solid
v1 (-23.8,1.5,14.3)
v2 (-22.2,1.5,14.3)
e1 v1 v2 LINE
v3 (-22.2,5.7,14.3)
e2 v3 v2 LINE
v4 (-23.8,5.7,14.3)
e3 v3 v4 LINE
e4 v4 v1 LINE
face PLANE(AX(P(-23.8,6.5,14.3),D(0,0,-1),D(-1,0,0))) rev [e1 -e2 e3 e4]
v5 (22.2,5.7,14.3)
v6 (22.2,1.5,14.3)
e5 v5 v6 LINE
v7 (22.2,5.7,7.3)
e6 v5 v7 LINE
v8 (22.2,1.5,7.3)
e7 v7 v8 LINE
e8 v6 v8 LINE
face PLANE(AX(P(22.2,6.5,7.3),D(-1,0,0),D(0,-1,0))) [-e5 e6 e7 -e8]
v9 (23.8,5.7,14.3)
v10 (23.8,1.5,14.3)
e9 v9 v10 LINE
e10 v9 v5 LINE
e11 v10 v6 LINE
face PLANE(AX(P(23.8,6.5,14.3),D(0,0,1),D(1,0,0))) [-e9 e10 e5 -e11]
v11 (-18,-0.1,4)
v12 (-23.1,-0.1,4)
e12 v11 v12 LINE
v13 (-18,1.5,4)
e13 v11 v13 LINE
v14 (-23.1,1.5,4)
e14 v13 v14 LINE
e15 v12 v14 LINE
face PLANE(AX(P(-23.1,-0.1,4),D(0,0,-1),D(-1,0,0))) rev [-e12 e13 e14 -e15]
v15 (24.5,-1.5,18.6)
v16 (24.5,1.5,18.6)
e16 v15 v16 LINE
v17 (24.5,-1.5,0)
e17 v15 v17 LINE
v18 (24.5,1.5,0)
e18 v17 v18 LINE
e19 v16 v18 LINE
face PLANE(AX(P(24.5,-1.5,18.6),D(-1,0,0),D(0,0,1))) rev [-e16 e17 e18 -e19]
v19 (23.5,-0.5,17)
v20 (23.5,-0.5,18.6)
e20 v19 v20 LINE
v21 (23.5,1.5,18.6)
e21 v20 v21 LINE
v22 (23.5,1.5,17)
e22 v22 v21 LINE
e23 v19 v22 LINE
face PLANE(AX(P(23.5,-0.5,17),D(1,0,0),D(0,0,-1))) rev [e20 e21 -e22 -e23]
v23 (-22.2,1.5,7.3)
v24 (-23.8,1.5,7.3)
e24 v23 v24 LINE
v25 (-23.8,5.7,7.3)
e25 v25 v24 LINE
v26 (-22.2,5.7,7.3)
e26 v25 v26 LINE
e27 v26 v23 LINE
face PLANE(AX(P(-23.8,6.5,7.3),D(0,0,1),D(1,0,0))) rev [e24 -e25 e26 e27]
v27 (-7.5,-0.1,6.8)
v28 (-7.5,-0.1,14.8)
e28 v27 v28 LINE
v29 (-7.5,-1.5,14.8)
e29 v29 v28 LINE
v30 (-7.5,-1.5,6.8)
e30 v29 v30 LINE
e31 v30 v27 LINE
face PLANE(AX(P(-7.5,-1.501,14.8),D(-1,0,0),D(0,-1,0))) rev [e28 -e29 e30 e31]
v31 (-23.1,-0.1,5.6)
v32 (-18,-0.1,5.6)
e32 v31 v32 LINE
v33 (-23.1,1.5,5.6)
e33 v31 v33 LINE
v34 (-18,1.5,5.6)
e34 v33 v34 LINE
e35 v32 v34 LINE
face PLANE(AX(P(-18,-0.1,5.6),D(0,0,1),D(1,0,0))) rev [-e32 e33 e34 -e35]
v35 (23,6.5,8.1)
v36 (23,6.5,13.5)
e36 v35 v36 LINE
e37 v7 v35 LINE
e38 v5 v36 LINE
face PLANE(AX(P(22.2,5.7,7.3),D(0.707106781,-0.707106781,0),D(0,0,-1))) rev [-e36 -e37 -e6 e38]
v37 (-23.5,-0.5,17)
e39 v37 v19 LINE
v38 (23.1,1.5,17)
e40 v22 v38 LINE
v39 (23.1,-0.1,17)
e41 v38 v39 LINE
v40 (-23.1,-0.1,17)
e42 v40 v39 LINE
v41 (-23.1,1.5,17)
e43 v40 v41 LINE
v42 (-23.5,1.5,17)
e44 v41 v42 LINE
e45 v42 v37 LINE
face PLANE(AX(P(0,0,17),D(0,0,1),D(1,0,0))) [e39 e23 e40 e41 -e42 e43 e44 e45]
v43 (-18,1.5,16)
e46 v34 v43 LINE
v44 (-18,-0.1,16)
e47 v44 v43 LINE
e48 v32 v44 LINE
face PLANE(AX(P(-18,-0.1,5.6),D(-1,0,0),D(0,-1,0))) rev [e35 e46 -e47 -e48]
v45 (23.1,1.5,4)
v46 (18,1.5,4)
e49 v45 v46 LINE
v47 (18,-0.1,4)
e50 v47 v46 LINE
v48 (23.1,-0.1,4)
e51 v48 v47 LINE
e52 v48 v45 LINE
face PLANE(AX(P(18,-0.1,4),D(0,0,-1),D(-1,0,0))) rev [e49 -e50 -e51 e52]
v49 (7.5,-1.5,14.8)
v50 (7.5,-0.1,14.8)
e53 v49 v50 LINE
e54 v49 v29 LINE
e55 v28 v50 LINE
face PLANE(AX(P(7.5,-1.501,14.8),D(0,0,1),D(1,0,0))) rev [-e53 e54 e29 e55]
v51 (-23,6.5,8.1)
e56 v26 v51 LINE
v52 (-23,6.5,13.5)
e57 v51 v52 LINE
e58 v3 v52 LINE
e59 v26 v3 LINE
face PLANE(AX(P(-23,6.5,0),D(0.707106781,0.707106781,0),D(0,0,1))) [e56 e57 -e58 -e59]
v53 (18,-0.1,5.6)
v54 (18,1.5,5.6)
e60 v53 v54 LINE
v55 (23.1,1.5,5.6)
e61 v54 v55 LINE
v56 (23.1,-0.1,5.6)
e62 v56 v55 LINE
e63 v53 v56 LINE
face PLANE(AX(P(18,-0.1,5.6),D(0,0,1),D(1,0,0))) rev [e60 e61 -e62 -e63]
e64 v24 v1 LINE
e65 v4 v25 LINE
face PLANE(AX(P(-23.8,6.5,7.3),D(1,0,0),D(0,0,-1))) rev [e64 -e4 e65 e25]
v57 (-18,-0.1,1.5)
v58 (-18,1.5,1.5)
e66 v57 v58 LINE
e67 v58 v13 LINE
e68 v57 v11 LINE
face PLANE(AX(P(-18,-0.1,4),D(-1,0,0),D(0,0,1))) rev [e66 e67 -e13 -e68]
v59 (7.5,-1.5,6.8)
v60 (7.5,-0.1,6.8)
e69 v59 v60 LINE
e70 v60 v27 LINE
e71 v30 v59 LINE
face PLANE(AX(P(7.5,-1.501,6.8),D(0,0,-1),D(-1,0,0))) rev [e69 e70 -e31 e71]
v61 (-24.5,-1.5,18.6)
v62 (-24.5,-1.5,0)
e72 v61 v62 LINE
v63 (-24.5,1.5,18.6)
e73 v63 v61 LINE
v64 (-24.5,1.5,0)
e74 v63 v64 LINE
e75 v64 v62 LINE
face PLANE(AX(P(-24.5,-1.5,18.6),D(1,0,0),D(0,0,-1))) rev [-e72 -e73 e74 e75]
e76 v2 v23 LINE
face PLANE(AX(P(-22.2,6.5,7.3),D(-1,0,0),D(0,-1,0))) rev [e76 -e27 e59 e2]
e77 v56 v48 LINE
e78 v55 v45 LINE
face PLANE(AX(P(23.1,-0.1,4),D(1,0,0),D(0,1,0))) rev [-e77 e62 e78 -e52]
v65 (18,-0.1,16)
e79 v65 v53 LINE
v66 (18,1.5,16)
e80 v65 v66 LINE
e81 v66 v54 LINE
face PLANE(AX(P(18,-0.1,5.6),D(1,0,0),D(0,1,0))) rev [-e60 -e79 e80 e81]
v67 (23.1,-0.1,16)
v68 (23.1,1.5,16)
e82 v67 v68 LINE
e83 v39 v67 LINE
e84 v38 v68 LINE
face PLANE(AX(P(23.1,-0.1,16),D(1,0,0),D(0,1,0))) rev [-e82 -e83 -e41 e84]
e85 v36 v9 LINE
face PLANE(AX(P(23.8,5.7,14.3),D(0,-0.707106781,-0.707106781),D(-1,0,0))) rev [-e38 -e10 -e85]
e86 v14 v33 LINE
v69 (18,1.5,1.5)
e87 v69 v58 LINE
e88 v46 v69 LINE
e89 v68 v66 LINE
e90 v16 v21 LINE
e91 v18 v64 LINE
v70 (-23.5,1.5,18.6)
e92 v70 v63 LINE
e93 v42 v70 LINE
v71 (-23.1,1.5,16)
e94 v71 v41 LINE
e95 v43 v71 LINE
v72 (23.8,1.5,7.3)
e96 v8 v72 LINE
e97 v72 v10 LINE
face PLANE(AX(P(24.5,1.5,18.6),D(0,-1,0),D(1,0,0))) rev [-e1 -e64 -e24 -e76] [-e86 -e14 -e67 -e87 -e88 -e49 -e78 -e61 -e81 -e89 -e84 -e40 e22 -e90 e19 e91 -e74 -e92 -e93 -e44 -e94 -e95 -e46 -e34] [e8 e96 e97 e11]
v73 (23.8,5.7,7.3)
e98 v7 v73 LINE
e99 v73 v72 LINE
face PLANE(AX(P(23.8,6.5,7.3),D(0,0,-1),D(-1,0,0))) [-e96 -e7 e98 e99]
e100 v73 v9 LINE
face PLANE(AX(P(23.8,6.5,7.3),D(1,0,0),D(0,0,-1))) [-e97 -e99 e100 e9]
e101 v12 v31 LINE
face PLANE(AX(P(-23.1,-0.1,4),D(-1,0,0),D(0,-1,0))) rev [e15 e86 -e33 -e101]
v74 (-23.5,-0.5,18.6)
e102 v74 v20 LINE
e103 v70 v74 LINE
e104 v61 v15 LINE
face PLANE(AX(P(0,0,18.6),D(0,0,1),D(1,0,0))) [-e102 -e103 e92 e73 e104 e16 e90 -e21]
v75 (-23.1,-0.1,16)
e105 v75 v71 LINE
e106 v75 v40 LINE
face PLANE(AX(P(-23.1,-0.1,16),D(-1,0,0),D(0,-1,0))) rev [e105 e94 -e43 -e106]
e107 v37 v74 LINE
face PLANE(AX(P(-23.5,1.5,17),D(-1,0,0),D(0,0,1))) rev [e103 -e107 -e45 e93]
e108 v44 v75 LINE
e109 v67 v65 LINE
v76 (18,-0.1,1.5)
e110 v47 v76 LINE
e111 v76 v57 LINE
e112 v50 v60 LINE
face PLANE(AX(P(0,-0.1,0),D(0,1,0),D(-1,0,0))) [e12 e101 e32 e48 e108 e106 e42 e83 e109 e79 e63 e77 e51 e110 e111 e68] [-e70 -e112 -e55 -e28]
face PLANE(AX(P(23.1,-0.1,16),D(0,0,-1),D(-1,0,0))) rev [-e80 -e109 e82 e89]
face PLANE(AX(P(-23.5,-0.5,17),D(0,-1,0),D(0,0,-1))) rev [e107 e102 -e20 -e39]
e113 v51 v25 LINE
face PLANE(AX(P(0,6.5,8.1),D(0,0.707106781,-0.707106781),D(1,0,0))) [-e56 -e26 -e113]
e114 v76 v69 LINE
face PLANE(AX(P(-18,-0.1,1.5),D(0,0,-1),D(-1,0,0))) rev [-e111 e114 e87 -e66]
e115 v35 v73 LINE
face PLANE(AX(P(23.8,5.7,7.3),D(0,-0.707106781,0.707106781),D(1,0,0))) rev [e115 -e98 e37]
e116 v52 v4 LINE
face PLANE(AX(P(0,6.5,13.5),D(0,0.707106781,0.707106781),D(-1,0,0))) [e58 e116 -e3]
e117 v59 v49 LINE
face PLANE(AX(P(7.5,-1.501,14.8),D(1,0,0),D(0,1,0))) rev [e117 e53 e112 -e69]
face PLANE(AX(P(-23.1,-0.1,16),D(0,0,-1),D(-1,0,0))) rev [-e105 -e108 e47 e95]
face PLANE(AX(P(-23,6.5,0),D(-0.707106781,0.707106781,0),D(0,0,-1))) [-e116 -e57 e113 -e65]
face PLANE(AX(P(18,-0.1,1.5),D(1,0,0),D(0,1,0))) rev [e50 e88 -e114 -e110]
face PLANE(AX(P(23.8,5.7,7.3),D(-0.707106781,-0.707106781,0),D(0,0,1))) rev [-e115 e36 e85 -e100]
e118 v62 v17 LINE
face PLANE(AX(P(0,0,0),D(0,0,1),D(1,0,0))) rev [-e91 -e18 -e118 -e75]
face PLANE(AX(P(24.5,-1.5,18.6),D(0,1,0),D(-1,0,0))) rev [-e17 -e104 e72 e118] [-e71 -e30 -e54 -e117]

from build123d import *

# Parameters (mm, degrees)
ESQUISSE1_W                  = 49
ESQUISSE1_H                  = 3
BOSS_EXTRU_1_DEPTH           = 18.6
ENL_V_MAT_EXTRU_2_DEPTH      = 1.6
ENL_V_MAT_EXTRU_3_REACH      = 32.802
ESQUISSE6_W                  = 15
ESQUISSE6_H                  = 8
ESQUISSE7_W                  = 1.6
ESQUISSE7_H                  = 7
BOSS_EXTRU_2_DEPTH           = 5
CHANFREIN1_SIZE              = 0.8
CHANFREIN1_OF_SYM_TRIE1_SIZE = 0.8
ESQUISSE8_W                  = 47
ESQUISSE8_H                  = 2
ENL_V_MAT_EXTRU_4_DEPTH      = 1.6


with BuildPart() as part:
    # Esquisse1 → Boss.-Extru.1 (new body)
    with BuildSketch(Plane.XY):
        Rectangle(ESQUISSE1_W, ESQUISSE1_H)
    extrude(amount=BOSS_EXTRU_1_DEPTH)

    # Esquisse5 → Enlèv. mat.-Extru.2 (cut)
    with BuildSketch(Plane(origin=(0, 1.5, 0), x_dir=(1, 0, 0), z_dir=(0, 1, 0))):
        Polygon((-23.1, -4), (-23.1, -5.6), (-18, -5.6), (-18, -16), (-23.1, -16), (-23.1, -17.6), (23.1, -17.6), (23.1, -16), (18, -16), (18, -5.6), (23.1, -5.6), (23.1, -4), (18, -4), (18, -1.5), (-18, -1.5), (-18, -4), align=None)
    extrude(amount=-ENL_V_MAT_EXTRU_2_DEPTH, mode=Mode.SUBTRACT)

    # Esquisse6 → Enlèv. mat.-Extru.3 (cut, up to next)
    with BuildSketch(Plane(origin=(0, -0.1, 0), x_dir=(1, 0, 0), z_dir=(0, 1, 0)), mode=Mode.PRIVATE) as enl_v_mat_extru_3_sk1:
        with Locations((0, -10.8)):
            Rectangle(ESQUISSE6_W, ESQUISSE6_H)
    enl_v_mat_extru_3_tool1 = extrude(enl_v_mat_extru_3_sk1.sketch, amount=-ENL_V_MAT_EXTRU_3_REACH, mode=Mode.PRIVATE) & part.part
    add(enl_v_mat_extru_3_tool1.solids().sort_by_distance((0, -0.1, 10.8))[0], mode=Mode.SUBTRACT)

    # Esquisse7 → Boss.-Extru.2 (add)
    with BuildSketch(Plane(origin=(0, 1.5, 0), x_dir=(1, 0, 0), z_dir=(0, 1, 0))):
        with Locations((-23, -10.8)):
            Rectangle(ESQUISSE7_W, ESQUISSE7_H)
    boss_extru_2 = extrude(amount=BOSS_EXTRU_2_DEPTH)

    # Chanfrein1
    chanfrein1_edges = [part.edges().sort_by_distance(p)[0] for p in [
        (-22.2, 6.5, 10.8),
        (-23, 6.5, 7.3),
        (-23.8, 6.5, 10.8),
        (-23, 6.5, 14.3),
    ]]
    chamfer(chanfrein1_edges, length=CHANFREIN1_SIZE - 0.0001)  # a hair under: the kernel refuses the full size

    # Symétrie1: Boss.-Extru.2 across plane
    add(boss_extru_2.mirror(Plane(origin=(0, 0, 0), x_dir=(0, 0, 1), z_dir=(1, 0, 0))))

    # Chanfrein1 of Symétrie1
    chanfrein1_of_sym_trie1_edges = [part.edges().sort_by_distance(p)[0] for p in [
        (22.2, 6.5, 10.8),
        (23, 6.5, 7.3),
        (23.8, 6.5, 10.8),
        (23, 6.5, 14.3),
    ]]
    chamfer(chanfrein1_of_sym_trie1_edges, length=CHANFREIN1_OF_SYM_TRIE1_SIZE - 0.0001)  # a hair under: the kernel refuses the full size

    # Esquisse8 → Enlèv. mat.-Extru.4 (cut)
    with BuildSketch(Plane.XY.offset(18.6)):
        with Locations((0, 0.5)):
            Rectangle(ESQUISSE8_W, ESQUISSE8_H)
    extrude(amount=-ENL_V_MAT_EXTRU_4_DEPTH, mode=Mode.SUBTRACT)


solid = part.part
